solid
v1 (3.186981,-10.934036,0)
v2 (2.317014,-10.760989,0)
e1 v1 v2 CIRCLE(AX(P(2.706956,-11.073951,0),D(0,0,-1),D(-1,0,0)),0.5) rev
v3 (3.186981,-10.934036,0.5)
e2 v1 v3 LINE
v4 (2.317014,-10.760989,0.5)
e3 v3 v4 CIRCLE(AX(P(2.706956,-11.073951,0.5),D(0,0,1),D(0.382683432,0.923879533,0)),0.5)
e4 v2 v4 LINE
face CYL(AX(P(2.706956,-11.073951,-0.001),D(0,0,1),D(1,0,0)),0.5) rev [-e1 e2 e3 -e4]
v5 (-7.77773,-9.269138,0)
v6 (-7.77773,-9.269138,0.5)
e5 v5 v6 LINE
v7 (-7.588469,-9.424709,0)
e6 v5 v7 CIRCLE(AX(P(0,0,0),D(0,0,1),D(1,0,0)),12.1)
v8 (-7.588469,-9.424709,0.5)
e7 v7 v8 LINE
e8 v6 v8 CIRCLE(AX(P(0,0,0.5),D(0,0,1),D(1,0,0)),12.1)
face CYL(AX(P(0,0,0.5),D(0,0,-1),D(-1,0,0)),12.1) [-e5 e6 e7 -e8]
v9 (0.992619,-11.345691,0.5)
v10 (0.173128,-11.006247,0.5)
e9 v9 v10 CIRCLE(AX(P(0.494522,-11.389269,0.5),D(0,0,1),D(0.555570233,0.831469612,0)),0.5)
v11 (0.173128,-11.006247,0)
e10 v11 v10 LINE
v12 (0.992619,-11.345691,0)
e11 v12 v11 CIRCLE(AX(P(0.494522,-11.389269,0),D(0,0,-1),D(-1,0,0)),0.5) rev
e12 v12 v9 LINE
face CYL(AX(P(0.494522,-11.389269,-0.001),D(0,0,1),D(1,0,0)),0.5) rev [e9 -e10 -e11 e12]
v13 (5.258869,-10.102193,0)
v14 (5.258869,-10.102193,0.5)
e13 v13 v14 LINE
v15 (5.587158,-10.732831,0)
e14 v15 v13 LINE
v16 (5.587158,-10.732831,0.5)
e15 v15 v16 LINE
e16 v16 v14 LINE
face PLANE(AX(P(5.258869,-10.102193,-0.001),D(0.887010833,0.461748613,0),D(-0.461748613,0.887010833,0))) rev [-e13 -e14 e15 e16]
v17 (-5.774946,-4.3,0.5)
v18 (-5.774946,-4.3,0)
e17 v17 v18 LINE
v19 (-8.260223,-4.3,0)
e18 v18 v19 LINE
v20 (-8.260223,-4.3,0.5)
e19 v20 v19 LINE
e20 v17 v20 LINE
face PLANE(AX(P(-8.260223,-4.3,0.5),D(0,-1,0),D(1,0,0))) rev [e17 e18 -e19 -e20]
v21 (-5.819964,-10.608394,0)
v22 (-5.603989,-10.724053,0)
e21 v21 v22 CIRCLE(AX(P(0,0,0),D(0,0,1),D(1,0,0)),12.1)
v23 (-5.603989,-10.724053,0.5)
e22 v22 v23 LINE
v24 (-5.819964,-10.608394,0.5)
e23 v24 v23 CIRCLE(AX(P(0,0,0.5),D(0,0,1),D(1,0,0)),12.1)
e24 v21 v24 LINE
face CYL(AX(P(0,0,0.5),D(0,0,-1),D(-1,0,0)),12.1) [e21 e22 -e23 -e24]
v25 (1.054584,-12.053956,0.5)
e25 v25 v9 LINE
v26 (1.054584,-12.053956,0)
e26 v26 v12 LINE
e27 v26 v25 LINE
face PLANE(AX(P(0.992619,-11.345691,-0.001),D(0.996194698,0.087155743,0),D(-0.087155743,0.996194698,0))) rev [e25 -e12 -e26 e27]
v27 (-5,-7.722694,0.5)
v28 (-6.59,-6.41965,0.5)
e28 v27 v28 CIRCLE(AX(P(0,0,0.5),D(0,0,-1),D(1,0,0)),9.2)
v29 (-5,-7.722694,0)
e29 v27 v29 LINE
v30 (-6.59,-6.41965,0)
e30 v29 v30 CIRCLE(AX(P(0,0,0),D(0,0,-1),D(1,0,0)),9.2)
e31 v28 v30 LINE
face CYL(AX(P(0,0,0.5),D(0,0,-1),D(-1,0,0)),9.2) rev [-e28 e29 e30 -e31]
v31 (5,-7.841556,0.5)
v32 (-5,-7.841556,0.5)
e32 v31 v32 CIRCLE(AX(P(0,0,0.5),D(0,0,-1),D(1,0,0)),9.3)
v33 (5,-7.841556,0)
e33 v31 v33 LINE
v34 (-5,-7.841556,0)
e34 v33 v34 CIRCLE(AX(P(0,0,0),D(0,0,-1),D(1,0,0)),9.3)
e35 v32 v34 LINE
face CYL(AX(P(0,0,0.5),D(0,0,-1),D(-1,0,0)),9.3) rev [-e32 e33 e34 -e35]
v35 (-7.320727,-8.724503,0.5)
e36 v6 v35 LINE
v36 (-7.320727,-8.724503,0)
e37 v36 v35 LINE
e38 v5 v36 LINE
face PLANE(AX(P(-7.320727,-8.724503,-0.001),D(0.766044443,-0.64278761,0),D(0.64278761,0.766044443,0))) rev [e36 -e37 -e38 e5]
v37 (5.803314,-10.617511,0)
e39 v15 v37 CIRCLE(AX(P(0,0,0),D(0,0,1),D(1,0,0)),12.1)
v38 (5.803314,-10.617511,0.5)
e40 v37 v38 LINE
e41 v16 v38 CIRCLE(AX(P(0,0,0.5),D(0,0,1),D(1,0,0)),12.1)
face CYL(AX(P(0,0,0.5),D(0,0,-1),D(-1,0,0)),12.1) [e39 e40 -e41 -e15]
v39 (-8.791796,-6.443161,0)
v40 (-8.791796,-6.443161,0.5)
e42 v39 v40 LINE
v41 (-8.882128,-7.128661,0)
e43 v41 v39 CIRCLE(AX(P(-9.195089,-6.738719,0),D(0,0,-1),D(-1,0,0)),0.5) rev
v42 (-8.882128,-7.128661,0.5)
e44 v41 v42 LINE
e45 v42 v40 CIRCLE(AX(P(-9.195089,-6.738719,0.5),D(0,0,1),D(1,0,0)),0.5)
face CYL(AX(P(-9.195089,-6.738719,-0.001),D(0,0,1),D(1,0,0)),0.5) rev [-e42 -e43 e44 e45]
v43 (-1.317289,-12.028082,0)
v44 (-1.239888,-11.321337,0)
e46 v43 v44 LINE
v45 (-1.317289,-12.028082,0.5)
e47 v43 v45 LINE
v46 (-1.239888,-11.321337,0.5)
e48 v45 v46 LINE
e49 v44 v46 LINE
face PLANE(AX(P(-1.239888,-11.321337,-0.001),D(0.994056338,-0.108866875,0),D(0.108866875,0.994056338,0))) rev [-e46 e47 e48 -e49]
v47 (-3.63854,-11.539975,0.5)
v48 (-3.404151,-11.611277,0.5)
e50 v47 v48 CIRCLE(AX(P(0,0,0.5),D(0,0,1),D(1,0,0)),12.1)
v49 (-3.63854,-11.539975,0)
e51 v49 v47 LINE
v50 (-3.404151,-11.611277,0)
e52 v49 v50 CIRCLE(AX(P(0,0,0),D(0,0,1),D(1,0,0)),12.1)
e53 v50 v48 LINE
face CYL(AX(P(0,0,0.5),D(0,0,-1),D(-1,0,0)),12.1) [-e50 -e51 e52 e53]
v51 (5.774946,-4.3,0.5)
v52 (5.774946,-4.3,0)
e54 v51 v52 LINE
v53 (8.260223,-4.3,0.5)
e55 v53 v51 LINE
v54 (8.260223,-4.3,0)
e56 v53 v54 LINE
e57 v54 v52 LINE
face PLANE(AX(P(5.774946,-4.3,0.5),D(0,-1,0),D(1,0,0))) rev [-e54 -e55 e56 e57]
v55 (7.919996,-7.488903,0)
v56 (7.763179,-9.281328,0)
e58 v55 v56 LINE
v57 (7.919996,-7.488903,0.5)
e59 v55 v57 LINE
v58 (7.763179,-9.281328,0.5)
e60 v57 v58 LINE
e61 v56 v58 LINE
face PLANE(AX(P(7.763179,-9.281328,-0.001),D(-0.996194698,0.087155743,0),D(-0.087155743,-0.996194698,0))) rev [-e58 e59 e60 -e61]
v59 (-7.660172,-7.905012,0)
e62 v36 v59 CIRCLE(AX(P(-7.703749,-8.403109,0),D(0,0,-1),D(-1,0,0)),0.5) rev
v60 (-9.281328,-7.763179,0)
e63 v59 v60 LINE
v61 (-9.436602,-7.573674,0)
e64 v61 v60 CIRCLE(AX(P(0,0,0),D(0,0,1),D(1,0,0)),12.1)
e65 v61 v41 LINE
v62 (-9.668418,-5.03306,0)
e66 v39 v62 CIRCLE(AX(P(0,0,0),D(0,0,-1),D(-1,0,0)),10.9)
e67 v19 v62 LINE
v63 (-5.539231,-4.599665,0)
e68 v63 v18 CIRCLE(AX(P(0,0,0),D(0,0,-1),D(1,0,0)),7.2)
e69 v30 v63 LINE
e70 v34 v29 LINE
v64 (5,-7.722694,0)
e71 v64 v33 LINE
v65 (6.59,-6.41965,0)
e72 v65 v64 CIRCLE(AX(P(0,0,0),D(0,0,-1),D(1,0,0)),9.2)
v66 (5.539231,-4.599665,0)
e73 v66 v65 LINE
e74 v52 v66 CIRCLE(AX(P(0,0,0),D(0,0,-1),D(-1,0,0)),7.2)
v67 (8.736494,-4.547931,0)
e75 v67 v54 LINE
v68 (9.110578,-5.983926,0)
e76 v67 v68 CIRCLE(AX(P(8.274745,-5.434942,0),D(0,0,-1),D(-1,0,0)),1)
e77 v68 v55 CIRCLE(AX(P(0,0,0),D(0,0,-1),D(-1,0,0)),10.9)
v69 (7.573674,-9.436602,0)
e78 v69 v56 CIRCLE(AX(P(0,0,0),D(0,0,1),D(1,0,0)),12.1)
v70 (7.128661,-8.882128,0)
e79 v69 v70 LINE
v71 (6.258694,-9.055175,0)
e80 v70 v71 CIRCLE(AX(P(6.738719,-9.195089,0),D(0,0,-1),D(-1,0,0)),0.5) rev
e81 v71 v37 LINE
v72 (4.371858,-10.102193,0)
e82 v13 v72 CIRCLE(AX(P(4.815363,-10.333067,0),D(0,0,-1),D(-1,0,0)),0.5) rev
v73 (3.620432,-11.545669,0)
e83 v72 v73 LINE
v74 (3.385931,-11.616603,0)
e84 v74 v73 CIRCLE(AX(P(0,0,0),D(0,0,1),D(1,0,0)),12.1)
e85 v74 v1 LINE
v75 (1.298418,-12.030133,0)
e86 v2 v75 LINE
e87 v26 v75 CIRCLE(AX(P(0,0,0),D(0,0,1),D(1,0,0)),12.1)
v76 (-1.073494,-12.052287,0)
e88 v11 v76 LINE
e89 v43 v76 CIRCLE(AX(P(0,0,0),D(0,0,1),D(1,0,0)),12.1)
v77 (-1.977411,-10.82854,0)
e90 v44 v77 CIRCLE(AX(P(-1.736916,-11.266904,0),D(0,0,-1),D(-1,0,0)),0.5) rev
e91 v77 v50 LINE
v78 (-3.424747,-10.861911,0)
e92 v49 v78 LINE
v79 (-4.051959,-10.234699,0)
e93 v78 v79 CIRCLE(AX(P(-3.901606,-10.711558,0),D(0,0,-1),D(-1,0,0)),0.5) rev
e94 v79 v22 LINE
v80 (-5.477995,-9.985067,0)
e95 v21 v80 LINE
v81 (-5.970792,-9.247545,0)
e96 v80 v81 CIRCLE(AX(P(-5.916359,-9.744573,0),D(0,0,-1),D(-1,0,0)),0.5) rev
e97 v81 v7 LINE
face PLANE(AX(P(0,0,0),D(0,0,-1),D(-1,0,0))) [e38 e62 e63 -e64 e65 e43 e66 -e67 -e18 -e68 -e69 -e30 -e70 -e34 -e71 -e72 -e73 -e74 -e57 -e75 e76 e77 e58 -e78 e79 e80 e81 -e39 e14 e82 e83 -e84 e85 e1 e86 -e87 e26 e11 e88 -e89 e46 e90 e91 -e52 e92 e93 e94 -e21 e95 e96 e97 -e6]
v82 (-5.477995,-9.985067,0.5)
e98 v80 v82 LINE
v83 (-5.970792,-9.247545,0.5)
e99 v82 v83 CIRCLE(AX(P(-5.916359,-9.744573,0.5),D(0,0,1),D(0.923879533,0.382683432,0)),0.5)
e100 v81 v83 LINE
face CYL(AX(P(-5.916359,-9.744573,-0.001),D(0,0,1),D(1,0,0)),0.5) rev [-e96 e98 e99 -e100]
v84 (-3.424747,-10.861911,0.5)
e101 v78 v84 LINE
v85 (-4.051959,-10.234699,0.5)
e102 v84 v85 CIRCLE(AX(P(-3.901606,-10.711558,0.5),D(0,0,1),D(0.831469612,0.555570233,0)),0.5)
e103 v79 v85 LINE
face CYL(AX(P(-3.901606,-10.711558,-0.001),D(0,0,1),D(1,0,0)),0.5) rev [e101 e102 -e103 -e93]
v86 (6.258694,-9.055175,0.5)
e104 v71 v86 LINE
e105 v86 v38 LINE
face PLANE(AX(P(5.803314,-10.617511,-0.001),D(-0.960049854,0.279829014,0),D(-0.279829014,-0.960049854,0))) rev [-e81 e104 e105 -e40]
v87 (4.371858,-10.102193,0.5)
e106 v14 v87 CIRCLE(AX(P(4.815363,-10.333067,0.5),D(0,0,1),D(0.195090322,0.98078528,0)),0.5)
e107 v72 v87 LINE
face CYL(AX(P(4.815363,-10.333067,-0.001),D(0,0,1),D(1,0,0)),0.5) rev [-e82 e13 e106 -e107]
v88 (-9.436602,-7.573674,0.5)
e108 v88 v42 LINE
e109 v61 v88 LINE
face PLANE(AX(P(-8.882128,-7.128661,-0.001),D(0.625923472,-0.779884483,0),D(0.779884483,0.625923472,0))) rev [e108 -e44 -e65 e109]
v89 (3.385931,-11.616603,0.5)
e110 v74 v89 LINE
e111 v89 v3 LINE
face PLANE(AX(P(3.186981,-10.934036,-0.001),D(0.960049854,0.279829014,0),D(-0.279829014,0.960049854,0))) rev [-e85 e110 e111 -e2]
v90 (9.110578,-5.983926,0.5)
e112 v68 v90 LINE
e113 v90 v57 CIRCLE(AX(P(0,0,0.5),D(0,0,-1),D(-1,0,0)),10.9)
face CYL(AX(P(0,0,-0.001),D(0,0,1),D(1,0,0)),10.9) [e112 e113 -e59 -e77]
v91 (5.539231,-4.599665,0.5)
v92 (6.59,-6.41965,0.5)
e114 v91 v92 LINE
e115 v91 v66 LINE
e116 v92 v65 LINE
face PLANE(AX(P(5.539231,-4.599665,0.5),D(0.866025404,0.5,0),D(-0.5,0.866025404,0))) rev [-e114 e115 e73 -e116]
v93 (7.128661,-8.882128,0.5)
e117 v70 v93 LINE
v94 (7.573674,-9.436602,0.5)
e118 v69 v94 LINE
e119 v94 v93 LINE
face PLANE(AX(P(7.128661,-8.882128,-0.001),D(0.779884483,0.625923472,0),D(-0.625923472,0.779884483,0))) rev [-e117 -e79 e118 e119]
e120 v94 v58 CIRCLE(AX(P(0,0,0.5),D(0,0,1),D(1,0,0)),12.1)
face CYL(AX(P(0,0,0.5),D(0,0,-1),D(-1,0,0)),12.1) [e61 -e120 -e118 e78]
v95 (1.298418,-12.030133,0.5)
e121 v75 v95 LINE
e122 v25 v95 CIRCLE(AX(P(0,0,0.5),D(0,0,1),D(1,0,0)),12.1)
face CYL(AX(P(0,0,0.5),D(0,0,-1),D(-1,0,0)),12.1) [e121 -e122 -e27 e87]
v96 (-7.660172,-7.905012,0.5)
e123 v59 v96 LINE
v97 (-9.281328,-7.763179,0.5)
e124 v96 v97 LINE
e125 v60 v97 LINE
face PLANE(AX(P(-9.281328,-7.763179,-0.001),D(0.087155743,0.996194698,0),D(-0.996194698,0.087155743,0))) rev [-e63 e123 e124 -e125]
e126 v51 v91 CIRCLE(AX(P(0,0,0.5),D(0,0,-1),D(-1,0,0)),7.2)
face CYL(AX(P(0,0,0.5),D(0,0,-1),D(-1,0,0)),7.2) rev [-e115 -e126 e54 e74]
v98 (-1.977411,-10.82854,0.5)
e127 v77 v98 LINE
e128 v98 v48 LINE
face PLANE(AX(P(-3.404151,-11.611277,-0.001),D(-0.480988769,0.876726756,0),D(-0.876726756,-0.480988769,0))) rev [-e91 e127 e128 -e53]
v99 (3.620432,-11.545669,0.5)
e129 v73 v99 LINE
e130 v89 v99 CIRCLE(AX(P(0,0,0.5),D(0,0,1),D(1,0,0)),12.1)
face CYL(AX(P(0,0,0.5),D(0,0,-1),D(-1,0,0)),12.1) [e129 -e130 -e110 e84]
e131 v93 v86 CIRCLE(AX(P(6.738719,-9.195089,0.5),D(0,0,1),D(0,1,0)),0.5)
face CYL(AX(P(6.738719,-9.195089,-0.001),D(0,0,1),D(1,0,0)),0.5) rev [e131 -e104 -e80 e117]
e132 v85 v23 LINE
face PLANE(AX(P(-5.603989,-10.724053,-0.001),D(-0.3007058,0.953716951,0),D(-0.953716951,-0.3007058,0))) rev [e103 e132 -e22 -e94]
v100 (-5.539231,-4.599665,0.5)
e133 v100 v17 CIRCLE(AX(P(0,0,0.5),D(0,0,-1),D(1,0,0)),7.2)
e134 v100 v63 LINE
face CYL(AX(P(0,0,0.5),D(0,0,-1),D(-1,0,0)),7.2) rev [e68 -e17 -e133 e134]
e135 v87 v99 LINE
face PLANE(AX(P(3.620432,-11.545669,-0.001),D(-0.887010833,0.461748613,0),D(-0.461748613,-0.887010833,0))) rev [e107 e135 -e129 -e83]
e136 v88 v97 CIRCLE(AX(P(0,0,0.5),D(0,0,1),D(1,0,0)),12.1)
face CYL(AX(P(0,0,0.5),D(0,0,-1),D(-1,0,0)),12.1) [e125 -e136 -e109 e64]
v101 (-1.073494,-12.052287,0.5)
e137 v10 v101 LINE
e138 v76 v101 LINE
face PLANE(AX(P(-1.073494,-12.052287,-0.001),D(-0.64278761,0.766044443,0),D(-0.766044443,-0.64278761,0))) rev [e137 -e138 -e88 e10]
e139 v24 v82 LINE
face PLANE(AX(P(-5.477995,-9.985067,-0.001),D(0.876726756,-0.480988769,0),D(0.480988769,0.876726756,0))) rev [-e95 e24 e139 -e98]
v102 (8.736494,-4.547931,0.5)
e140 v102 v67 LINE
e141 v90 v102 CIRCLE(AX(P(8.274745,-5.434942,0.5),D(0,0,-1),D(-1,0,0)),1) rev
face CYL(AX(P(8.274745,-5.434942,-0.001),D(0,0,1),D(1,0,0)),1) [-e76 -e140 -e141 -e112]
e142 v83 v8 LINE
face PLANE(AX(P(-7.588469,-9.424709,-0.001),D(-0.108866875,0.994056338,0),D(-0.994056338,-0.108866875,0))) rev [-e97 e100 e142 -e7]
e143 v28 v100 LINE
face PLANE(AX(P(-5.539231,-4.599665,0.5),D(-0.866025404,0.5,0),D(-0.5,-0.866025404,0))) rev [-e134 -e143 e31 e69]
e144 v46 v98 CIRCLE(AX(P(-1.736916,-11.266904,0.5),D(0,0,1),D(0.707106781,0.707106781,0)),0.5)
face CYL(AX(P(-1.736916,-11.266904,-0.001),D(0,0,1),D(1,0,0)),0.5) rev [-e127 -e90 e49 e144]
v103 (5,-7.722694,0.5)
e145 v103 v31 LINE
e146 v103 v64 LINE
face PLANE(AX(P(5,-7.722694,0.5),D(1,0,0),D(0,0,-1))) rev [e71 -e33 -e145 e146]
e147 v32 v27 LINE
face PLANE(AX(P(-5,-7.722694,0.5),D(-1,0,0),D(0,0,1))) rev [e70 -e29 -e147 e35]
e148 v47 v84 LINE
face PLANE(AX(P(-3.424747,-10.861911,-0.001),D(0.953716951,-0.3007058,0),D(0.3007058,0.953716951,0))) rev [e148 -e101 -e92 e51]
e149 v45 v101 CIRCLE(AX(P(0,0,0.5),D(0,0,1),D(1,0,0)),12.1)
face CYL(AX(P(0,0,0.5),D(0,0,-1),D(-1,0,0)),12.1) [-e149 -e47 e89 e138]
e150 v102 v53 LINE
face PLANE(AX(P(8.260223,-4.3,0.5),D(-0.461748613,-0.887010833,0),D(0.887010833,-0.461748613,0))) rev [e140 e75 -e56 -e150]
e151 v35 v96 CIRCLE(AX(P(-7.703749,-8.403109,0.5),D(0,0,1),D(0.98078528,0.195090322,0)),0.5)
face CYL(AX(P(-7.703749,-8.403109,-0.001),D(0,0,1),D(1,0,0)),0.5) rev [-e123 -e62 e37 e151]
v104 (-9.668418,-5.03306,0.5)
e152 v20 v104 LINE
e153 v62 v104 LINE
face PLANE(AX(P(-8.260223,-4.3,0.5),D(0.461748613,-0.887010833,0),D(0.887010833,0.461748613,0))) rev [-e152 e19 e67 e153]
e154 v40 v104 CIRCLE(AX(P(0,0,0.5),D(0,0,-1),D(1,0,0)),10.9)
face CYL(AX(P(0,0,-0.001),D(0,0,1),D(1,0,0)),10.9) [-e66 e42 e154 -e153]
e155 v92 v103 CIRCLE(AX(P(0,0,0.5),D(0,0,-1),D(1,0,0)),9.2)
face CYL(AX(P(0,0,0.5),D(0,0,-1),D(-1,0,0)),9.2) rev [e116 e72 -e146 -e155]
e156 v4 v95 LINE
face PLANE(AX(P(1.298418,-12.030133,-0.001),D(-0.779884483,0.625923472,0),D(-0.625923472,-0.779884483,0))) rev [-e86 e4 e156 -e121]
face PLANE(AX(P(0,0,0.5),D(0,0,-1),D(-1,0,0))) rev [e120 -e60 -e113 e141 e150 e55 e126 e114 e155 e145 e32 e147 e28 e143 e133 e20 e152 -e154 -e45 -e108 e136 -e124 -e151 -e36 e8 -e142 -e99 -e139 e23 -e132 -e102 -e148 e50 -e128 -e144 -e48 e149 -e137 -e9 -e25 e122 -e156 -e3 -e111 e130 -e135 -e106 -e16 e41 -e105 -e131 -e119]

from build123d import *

# Parameters (mm, degrees)
OTHER_10076_5_DEPTH = 0.5
CUT_EXTRUDE1_REACH  = 18.147


# Read off the part's stored shape, not the designer's step: 10076-5
with BuildPart() as part:
    # Other 10076-5 outline → Other 10076-5 (new body)
    with BuildSketch(Plane.XY):
        with BuildLine():
            ThreePointArc((7.573674013, -9.436602245), (7.668819519, -9.359444812), (7.763179028, -9.281328104))
            Line((7.763179028, -9.281328104), (7.919995926, -7.488902759))
            ThreePointArc((7.919995926, -7.488902759), (8.548470738, -6.76266575), (9.110578105, -5.983925684))
            ThreePointArc((9.110578105, -5.983925684), (9.242448569, -5.182849851), (8.736493865, -4.547930843))
            Line((8.736493865, -4.547930843), (8.260223146, -4.3))
            Line((8.260223146, -4.3), (5.774945887, -4.3))
            ThreePointArc((5.774945887, -4.3), (5.659072475, -4.451392897), (5.53923133, -4.5996648))
            Line((5.53923133, -4.5996648), (6.59, -6.419649523))
            ThreePointArc((6.59, -6.419649523), (5.831509763, -7.1157216), (5, -7.722693831))
            Line((5, -7.722693831), (5, -7.841555968))
            ThreePointArc((5, -7.841555968), (0, -9.3), (-5, -7.841555968))
            Line((-5, -7.841555968), (-5, -7.722693831))
            ThreePointArc((-5, -7.722693831), (-5.831509763, -7.1157216), (-6.59, -6.419649523))
            Line((-6.59, -6.419649523), (-5.53923133, -4.5996648))
            ThreePointArc((-5.53923133, -4.5996648), (-5.659072475, -4.451392897), (-5.774945887, -4.3))
            Line((-5.774945887, -4.3), (-8.260223146, -4.3))
            Line((-8.260223146, -4.3), (-10.732831081, -5.58715822))
            ThreePointArc((-10.732831081, -5.58715822), (-10.675718173, -5.6955282), (-10.617511084, -5.803314431))
            Line((-10.617511084, -5.803314431), (-9.055174855, -6.258693914))
            ThreePointArc((-9.055174855, -6.258693914), (-8.704696722, -6.64117368), (-8.882127626, -7.128661083))
            Line((-8.882127626, -7.128661083), (-9.436602245, -7.573674013))
            ThreePointArc((-9.436602245, -7.573674013), (-9.359444812, -7.668819519), (-9.281328104, -7.763179028))
            Line((-9.281328104, -7.763179028), (-7.660171598, -7.905011844))
            ThreePointArc((-7.660171598, -7.905011844), (-7.241809703, -8.211767477), (-7.320727248, -8.724502998))
            Line((-7.320727248, -8.724502998), (-7.777730077, -9.269137762))
            ThreePointArc((-7.777730077, -9.269137762), (-7.683493234, -9.347402405), (-7.588468891, -9.424709008))
            Line((-7.588468891, -9.424709008), (-5.970792243, -9.247544602))
            ThreePointArc((-5.970792243, -9.247544602), (-5.500623999, -9.466787654), (-5.477995427, -9.985067155))
            Line((-5.477995427, -9.985067155), (-5.819964104, -10.608393744))
            ThreePointArc((-5.819964104, -10.608393744), (-5.712269322, -10.666769858), (-5.603989074, -10.724052707))
            Line((-5.603989074, -10.724052707), (-4.05195869, -10.234699407))
            ThreePointArc((-4.05195869, -10.234699407), (-3.548052399, -10.358004491), (-3.424747314, -10.861910782))
            Line((-3.424747314, -10.861910782), (-3.638540174, -11.539975104))
            ThreePointArc((-3.638540174, -11.539975104), (-3.521526102, -11.576219327), (-3.404151099, -11.611277074))
            Line((-3.404151099, -11.611277074), (-1.977410637, -10.828540453))
            ThreePointArc((-1.977410637, -10.828540453), (-1.459131136, -10.851169025), (-1.239888083, -11.321337268))
            Line((-1.239888083, -11.321337268), (-1.317289186, -12.028081692))
            ThreePointArc((-1.317289186, -12.028081692), (-1.195452609, -12.04080118), (-1.073493507, -12.052286575))
            Line((-1.073493507, -12.052286575), (0.173128198, -11.006246762))
            ThreePointArc((0.173128198, -11.006246762), (0.685863719, -10.927329218), (0.992619352, -11.345691113))
            Line((0.992619352, -11.345691113), (1.054584487, -12.053955847))
            ThreePointArc((1.054584487, -12.053955847), (1.176561457, -12.042661796), (1.298417839, -12.030133462))
            Line((1.298417839, -12.030133462), (2.317013814, -10.760989181))
            ThreePointArc((2.317013814, -10.760989181), (2.804501216, -10.583558277), (3.186980982, -10.93403641))
            Line((3.186980982, -10.93403641), (3.38593107, -11.616603238))
            ThreePointArc((3.38593107, -11.616603238), (3.503360927, -11.581729673), (3.620431715, -11.545669067))
            Line((3.620431715, -11.545669067), (4.371857887, -10.10219282))
            ThreePointArc((4.371857887, -10.10219282), (4.815363304, -9.833067127), (5.258868721, -10.10219282))
            Line((5.258868721, -10.10219282), (5.58715822, -10.732831081))
            ThreePointArc((5.58715822, -10.732831081), (5.6955282, -10.675718173), (5.803314431, -10.617511084))
            Line((5.803314431, -10.617511084), (6.258693914, -9.055174855))
            ThreePointArc((6.258693914, -9.055174855), (6.64117368, -8.704696722), (7.128661083, -8.882127626))
            Line((7.128661083, -8.882127626), (7.573674013, -9.436602245))
        make_face()
    extrude(amount=OTHER_10076_5_DEPTH)

    # Sketch1 → Cut-Extrude1 (cut, up to next)
    with BuildSketch(Plane.XY.offset(0.5), mode=Mode.PRIVATE) as cut_extrude1_sk1:
        with BuildLine():
            Line((-9.668418082, -5.033059884), (-10.732831081, -5.58715822))
            ThreePointArc((-10.732831081, -5.58715822), (-10.675718173, -5.6955282), (-10.617511084, -5.803314431))
            Line((-10.617511084, -5.803314431), (-9.055174855, -6.258693914))
            ThreePointArc((-9.055174855, -6.258693914), (-8.908251896, -6.329177308), (-8.791795969, -6.443160998))
            ThreePointArc((-8.791795969, -6.443160998), (-9.25699584, -5.754826497), (-9.668418082, -5.033059884))
        make_face()
    cut_extrude1_tool1 = extrude(cut_extrude1_sk1.sketch, amount=-CUT_EXTRUDE1_REACH, mode=Mode.PRIVATE) & part.part
    add(cut_extrude1_tool1.solids().sort_by_distance((-9.821515, -5.682947, 0.5))[0], mode=Mode.SUBTRACT)


solid = part.part
